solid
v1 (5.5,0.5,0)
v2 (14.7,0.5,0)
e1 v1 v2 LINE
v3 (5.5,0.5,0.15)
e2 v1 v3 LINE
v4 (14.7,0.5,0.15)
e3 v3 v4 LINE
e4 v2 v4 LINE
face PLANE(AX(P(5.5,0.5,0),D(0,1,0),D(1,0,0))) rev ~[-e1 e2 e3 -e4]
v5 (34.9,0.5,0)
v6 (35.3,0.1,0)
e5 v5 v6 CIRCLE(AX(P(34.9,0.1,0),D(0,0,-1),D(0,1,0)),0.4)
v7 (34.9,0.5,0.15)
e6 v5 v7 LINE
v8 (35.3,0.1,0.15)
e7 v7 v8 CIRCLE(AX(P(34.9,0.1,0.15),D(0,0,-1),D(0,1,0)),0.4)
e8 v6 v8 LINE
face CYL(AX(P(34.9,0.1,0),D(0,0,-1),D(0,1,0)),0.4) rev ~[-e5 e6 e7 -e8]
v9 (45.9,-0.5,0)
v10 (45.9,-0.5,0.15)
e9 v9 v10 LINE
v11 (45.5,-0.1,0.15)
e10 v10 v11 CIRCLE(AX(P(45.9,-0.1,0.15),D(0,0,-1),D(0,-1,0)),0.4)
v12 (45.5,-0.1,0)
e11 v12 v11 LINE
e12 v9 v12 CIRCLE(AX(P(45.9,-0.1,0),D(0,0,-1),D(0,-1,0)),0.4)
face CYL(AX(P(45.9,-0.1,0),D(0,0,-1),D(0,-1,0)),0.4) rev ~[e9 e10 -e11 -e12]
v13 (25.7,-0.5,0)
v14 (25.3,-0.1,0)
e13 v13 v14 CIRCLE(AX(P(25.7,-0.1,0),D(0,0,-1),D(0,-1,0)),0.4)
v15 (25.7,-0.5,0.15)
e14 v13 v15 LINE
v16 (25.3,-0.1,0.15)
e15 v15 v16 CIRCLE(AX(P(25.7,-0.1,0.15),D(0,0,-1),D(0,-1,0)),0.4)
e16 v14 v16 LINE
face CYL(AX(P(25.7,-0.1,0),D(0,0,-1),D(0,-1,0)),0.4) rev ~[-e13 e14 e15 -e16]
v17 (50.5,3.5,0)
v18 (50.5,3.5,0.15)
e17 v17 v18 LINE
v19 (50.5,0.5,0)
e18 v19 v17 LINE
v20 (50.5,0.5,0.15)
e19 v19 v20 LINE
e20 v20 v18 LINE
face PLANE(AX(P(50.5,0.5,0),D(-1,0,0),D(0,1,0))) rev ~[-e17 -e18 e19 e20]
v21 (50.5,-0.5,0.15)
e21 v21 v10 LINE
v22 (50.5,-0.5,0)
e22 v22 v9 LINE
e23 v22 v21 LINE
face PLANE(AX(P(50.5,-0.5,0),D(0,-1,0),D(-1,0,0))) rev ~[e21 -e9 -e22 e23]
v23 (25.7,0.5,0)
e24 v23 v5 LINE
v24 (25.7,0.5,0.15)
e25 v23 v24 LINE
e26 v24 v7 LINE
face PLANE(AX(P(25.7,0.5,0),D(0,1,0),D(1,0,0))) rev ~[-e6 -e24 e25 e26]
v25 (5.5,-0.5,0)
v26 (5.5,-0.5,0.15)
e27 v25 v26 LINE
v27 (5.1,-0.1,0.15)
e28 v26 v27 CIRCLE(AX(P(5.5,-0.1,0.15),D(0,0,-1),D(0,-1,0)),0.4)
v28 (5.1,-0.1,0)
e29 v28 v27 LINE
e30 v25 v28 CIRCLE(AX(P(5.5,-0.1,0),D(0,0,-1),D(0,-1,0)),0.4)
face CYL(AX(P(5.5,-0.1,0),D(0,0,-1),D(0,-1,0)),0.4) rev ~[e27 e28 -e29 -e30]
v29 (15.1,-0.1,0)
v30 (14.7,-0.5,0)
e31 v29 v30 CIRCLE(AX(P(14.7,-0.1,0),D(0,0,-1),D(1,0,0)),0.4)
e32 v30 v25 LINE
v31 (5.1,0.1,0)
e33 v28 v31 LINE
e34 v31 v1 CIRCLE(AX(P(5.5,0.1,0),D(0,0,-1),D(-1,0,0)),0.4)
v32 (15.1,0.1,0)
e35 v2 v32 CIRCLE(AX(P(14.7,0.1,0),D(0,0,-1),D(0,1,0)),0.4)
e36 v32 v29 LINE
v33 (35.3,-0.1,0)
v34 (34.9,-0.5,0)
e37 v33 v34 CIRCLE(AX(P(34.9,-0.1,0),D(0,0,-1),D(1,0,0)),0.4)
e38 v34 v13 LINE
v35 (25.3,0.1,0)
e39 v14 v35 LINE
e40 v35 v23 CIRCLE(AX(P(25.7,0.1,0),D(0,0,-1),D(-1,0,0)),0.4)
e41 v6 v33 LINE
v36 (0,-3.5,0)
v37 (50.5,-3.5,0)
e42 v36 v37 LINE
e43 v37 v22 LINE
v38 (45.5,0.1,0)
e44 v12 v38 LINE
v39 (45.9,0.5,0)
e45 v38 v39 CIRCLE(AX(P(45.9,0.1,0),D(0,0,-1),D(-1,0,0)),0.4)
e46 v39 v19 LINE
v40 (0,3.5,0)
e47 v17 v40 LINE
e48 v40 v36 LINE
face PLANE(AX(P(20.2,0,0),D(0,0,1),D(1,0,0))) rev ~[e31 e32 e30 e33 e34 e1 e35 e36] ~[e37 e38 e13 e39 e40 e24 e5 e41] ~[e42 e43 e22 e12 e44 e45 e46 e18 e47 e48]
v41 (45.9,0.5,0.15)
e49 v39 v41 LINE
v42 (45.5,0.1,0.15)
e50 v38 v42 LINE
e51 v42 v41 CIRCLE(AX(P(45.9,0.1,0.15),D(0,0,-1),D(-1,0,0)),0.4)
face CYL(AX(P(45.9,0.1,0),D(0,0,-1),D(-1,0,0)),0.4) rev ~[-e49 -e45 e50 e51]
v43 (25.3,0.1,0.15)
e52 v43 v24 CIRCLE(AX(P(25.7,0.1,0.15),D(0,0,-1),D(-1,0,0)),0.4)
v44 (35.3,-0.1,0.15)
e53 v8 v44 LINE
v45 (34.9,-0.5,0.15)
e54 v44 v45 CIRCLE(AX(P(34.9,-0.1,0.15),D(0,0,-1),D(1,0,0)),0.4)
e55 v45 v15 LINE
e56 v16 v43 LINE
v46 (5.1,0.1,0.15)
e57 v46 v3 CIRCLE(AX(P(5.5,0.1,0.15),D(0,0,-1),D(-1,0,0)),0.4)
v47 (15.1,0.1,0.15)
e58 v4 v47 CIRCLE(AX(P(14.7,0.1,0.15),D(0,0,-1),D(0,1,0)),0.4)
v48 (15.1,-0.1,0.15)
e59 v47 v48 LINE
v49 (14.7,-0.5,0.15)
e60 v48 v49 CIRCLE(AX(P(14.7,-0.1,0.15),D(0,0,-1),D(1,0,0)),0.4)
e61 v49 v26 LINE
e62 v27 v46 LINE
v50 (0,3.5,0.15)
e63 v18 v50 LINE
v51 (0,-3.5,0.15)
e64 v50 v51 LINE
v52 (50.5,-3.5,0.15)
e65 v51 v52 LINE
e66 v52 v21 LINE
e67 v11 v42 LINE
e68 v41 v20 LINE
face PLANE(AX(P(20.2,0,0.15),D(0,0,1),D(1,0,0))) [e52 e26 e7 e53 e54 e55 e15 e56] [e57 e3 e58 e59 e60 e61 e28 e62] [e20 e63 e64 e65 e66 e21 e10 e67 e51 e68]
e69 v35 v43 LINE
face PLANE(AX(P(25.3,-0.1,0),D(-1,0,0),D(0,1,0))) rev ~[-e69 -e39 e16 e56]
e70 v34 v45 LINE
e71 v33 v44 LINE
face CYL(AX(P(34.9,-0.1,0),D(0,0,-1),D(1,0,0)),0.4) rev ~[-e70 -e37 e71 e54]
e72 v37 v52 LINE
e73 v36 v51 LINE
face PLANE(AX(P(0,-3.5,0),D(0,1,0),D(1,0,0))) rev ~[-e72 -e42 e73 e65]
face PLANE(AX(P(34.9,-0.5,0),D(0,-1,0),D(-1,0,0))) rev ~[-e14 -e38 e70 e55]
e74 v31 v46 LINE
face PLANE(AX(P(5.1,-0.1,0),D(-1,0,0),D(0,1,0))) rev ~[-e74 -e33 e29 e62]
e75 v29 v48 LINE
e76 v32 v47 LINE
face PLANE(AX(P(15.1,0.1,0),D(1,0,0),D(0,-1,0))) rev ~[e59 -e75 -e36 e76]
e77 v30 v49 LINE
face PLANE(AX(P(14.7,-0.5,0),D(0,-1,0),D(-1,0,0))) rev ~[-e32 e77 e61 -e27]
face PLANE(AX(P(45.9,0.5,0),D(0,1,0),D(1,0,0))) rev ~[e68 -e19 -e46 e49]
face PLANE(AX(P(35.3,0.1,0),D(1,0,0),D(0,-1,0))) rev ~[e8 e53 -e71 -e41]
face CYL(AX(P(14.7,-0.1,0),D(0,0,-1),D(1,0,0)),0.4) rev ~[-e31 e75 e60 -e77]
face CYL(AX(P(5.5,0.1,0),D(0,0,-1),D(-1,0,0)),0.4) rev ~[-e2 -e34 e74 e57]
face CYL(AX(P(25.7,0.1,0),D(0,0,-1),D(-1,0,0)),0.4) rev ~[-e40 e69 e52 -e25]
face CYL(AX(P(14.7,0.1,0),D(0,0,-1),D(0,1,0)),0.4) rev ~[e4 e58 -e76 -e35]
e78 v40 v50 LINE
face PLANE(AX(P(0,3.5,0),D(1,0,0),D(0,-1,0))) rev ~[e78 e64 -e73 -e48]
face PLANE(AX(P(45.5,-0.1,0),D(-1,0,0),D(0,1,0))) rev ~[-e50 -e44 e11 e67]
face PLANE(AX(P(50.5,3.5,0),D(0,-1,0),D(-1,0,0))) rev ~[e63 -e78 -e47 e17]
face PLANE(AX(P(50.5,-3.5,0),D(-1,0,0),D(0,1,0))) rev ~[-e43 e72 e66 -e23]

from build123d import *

# Parameters (mm, degrees)
F1_DEPTH = 0.15


# Not quite as in the source:
# - a feature names something its author has since deleted; it is built from what else it names


with BuildPart() as f1:
    # F0 (on Top) → F1 (new body)
    with BuildSketch(Plane.XY):
        with BuildLine():
            Line((10.1, -0.5), (10.1, -3.5))
            Line((10.1, -3.5), (20.2, -3.5))
            Line((20.2, -3.5), (30.3, -3.5))
            Line((30.3, -3.5), (30.3, -0.5))
            Line((30.3, -0.5), (25.7, -0.5))
            ThreePointArc((25.7, -0.5), (25.4171572875, -0.3828427125), (25.3, -0.1))
            Line((25.3, -0.1), (25.3, 0.1))
            ThreePointArc((25.3, 0.1), (25.4171572875, 0.3828427125), (25.7, 0.5))
            Line((25.7, 0.5), (30.3, 0.5))
            Line((30.3, 0.5), (30.3, 3.5))
            Line((30.3, 3.5), (20.2, 3.5))
            Line((20.2, 3.5), (10.1, 3.5))
            Line((10.1, 3.5), (10.1, 0.5))
            Line((10.1, 0.5), (14.7, 0.5))
            ThreePointArc((14.7, 0.5), (14.9828427125, 0.3828427125), (15.1, 0.1))
            Line((15.1, 0.1), (15.1, -0.1))
            ThreePointArc((15.1, -0.1), (14.9828427125, -0.3828427125), (14.7, -0.5))
            Line((14.7, -0.5), (10.1, -0.5))
        make_face()
        with BuildLine():
            Line((30.3, -0.5), (30.3, -3.5))
            Line((30.3, -3.5), (40.4, -3.5))
            Line((40.4, -3.5), (50.5, -3.5))
            Line((50.5, -3.5), (50.5, -0.5))
            Line((50.5, -0.5), (45.9, -0.5))
            ThreePointArc((45.9, -0.5), (45.6171572875, -0.3828427125), (45.5, -0.1))
            Line((45.5, -0.1), (45.5, 0.1))
            ThreePointArc((45.5, 0.1), (45.6171572875, 0.3828427125), (45.9, 0.5))
            Line((45.9, 0.5), (50.5, 0.5))
            Line((50.5, 0.5), (50.5, 3.5))
            Line((50.5, 3.5), (40.4, 3.5))
            Line((40.4, 3.5), (30.3, 3.5))
            Line((30.3, 3.5), (30.3, 0.5))
            Line((30.3, 0.5), (34.9, 0.5))
            ThreePointArc((34.9, 0.5), (35.1828427125, 0.3828427125), (35.3, 0.1))
            Line((35.3, 0.1), (35.3, -0.1))
            ThreePointArc((35.3, -0.1), (35.1828427125, -0.3828427125), (34.9, -0.5))
            Line((34.9, -0.5), (30.3, -0.5))
        make_face()
        with BuildLine():
            Line((0, 3.5), (0, -3.5))
            Line((0, -3.5), (10.1, -3.5))
            Line((10.1, -3.5), (10.1, -0.5))
            Line((10.1, -0.5), (5.5, -0.5))
            ThreePointArc((5.5, -0.5), (5.2171572875, -0.3828427125), (5.1, -0.1))
            Line((5.1, -0.1), (5.1, 0.1))
            ThreePointArc((5.1, 0.1), (5.2171572875, 0.3828427125), (5.5, 0.5))
            Line((5.5, 0.5), (10.1, 0.5))
            Line((10.1, 0.5), (10.1, 3.5))
            Line((10.1, 3.5), (0, 3.5))
        make_face()
    extrude(amount=F1_DEPTH)


solid = f1.part
